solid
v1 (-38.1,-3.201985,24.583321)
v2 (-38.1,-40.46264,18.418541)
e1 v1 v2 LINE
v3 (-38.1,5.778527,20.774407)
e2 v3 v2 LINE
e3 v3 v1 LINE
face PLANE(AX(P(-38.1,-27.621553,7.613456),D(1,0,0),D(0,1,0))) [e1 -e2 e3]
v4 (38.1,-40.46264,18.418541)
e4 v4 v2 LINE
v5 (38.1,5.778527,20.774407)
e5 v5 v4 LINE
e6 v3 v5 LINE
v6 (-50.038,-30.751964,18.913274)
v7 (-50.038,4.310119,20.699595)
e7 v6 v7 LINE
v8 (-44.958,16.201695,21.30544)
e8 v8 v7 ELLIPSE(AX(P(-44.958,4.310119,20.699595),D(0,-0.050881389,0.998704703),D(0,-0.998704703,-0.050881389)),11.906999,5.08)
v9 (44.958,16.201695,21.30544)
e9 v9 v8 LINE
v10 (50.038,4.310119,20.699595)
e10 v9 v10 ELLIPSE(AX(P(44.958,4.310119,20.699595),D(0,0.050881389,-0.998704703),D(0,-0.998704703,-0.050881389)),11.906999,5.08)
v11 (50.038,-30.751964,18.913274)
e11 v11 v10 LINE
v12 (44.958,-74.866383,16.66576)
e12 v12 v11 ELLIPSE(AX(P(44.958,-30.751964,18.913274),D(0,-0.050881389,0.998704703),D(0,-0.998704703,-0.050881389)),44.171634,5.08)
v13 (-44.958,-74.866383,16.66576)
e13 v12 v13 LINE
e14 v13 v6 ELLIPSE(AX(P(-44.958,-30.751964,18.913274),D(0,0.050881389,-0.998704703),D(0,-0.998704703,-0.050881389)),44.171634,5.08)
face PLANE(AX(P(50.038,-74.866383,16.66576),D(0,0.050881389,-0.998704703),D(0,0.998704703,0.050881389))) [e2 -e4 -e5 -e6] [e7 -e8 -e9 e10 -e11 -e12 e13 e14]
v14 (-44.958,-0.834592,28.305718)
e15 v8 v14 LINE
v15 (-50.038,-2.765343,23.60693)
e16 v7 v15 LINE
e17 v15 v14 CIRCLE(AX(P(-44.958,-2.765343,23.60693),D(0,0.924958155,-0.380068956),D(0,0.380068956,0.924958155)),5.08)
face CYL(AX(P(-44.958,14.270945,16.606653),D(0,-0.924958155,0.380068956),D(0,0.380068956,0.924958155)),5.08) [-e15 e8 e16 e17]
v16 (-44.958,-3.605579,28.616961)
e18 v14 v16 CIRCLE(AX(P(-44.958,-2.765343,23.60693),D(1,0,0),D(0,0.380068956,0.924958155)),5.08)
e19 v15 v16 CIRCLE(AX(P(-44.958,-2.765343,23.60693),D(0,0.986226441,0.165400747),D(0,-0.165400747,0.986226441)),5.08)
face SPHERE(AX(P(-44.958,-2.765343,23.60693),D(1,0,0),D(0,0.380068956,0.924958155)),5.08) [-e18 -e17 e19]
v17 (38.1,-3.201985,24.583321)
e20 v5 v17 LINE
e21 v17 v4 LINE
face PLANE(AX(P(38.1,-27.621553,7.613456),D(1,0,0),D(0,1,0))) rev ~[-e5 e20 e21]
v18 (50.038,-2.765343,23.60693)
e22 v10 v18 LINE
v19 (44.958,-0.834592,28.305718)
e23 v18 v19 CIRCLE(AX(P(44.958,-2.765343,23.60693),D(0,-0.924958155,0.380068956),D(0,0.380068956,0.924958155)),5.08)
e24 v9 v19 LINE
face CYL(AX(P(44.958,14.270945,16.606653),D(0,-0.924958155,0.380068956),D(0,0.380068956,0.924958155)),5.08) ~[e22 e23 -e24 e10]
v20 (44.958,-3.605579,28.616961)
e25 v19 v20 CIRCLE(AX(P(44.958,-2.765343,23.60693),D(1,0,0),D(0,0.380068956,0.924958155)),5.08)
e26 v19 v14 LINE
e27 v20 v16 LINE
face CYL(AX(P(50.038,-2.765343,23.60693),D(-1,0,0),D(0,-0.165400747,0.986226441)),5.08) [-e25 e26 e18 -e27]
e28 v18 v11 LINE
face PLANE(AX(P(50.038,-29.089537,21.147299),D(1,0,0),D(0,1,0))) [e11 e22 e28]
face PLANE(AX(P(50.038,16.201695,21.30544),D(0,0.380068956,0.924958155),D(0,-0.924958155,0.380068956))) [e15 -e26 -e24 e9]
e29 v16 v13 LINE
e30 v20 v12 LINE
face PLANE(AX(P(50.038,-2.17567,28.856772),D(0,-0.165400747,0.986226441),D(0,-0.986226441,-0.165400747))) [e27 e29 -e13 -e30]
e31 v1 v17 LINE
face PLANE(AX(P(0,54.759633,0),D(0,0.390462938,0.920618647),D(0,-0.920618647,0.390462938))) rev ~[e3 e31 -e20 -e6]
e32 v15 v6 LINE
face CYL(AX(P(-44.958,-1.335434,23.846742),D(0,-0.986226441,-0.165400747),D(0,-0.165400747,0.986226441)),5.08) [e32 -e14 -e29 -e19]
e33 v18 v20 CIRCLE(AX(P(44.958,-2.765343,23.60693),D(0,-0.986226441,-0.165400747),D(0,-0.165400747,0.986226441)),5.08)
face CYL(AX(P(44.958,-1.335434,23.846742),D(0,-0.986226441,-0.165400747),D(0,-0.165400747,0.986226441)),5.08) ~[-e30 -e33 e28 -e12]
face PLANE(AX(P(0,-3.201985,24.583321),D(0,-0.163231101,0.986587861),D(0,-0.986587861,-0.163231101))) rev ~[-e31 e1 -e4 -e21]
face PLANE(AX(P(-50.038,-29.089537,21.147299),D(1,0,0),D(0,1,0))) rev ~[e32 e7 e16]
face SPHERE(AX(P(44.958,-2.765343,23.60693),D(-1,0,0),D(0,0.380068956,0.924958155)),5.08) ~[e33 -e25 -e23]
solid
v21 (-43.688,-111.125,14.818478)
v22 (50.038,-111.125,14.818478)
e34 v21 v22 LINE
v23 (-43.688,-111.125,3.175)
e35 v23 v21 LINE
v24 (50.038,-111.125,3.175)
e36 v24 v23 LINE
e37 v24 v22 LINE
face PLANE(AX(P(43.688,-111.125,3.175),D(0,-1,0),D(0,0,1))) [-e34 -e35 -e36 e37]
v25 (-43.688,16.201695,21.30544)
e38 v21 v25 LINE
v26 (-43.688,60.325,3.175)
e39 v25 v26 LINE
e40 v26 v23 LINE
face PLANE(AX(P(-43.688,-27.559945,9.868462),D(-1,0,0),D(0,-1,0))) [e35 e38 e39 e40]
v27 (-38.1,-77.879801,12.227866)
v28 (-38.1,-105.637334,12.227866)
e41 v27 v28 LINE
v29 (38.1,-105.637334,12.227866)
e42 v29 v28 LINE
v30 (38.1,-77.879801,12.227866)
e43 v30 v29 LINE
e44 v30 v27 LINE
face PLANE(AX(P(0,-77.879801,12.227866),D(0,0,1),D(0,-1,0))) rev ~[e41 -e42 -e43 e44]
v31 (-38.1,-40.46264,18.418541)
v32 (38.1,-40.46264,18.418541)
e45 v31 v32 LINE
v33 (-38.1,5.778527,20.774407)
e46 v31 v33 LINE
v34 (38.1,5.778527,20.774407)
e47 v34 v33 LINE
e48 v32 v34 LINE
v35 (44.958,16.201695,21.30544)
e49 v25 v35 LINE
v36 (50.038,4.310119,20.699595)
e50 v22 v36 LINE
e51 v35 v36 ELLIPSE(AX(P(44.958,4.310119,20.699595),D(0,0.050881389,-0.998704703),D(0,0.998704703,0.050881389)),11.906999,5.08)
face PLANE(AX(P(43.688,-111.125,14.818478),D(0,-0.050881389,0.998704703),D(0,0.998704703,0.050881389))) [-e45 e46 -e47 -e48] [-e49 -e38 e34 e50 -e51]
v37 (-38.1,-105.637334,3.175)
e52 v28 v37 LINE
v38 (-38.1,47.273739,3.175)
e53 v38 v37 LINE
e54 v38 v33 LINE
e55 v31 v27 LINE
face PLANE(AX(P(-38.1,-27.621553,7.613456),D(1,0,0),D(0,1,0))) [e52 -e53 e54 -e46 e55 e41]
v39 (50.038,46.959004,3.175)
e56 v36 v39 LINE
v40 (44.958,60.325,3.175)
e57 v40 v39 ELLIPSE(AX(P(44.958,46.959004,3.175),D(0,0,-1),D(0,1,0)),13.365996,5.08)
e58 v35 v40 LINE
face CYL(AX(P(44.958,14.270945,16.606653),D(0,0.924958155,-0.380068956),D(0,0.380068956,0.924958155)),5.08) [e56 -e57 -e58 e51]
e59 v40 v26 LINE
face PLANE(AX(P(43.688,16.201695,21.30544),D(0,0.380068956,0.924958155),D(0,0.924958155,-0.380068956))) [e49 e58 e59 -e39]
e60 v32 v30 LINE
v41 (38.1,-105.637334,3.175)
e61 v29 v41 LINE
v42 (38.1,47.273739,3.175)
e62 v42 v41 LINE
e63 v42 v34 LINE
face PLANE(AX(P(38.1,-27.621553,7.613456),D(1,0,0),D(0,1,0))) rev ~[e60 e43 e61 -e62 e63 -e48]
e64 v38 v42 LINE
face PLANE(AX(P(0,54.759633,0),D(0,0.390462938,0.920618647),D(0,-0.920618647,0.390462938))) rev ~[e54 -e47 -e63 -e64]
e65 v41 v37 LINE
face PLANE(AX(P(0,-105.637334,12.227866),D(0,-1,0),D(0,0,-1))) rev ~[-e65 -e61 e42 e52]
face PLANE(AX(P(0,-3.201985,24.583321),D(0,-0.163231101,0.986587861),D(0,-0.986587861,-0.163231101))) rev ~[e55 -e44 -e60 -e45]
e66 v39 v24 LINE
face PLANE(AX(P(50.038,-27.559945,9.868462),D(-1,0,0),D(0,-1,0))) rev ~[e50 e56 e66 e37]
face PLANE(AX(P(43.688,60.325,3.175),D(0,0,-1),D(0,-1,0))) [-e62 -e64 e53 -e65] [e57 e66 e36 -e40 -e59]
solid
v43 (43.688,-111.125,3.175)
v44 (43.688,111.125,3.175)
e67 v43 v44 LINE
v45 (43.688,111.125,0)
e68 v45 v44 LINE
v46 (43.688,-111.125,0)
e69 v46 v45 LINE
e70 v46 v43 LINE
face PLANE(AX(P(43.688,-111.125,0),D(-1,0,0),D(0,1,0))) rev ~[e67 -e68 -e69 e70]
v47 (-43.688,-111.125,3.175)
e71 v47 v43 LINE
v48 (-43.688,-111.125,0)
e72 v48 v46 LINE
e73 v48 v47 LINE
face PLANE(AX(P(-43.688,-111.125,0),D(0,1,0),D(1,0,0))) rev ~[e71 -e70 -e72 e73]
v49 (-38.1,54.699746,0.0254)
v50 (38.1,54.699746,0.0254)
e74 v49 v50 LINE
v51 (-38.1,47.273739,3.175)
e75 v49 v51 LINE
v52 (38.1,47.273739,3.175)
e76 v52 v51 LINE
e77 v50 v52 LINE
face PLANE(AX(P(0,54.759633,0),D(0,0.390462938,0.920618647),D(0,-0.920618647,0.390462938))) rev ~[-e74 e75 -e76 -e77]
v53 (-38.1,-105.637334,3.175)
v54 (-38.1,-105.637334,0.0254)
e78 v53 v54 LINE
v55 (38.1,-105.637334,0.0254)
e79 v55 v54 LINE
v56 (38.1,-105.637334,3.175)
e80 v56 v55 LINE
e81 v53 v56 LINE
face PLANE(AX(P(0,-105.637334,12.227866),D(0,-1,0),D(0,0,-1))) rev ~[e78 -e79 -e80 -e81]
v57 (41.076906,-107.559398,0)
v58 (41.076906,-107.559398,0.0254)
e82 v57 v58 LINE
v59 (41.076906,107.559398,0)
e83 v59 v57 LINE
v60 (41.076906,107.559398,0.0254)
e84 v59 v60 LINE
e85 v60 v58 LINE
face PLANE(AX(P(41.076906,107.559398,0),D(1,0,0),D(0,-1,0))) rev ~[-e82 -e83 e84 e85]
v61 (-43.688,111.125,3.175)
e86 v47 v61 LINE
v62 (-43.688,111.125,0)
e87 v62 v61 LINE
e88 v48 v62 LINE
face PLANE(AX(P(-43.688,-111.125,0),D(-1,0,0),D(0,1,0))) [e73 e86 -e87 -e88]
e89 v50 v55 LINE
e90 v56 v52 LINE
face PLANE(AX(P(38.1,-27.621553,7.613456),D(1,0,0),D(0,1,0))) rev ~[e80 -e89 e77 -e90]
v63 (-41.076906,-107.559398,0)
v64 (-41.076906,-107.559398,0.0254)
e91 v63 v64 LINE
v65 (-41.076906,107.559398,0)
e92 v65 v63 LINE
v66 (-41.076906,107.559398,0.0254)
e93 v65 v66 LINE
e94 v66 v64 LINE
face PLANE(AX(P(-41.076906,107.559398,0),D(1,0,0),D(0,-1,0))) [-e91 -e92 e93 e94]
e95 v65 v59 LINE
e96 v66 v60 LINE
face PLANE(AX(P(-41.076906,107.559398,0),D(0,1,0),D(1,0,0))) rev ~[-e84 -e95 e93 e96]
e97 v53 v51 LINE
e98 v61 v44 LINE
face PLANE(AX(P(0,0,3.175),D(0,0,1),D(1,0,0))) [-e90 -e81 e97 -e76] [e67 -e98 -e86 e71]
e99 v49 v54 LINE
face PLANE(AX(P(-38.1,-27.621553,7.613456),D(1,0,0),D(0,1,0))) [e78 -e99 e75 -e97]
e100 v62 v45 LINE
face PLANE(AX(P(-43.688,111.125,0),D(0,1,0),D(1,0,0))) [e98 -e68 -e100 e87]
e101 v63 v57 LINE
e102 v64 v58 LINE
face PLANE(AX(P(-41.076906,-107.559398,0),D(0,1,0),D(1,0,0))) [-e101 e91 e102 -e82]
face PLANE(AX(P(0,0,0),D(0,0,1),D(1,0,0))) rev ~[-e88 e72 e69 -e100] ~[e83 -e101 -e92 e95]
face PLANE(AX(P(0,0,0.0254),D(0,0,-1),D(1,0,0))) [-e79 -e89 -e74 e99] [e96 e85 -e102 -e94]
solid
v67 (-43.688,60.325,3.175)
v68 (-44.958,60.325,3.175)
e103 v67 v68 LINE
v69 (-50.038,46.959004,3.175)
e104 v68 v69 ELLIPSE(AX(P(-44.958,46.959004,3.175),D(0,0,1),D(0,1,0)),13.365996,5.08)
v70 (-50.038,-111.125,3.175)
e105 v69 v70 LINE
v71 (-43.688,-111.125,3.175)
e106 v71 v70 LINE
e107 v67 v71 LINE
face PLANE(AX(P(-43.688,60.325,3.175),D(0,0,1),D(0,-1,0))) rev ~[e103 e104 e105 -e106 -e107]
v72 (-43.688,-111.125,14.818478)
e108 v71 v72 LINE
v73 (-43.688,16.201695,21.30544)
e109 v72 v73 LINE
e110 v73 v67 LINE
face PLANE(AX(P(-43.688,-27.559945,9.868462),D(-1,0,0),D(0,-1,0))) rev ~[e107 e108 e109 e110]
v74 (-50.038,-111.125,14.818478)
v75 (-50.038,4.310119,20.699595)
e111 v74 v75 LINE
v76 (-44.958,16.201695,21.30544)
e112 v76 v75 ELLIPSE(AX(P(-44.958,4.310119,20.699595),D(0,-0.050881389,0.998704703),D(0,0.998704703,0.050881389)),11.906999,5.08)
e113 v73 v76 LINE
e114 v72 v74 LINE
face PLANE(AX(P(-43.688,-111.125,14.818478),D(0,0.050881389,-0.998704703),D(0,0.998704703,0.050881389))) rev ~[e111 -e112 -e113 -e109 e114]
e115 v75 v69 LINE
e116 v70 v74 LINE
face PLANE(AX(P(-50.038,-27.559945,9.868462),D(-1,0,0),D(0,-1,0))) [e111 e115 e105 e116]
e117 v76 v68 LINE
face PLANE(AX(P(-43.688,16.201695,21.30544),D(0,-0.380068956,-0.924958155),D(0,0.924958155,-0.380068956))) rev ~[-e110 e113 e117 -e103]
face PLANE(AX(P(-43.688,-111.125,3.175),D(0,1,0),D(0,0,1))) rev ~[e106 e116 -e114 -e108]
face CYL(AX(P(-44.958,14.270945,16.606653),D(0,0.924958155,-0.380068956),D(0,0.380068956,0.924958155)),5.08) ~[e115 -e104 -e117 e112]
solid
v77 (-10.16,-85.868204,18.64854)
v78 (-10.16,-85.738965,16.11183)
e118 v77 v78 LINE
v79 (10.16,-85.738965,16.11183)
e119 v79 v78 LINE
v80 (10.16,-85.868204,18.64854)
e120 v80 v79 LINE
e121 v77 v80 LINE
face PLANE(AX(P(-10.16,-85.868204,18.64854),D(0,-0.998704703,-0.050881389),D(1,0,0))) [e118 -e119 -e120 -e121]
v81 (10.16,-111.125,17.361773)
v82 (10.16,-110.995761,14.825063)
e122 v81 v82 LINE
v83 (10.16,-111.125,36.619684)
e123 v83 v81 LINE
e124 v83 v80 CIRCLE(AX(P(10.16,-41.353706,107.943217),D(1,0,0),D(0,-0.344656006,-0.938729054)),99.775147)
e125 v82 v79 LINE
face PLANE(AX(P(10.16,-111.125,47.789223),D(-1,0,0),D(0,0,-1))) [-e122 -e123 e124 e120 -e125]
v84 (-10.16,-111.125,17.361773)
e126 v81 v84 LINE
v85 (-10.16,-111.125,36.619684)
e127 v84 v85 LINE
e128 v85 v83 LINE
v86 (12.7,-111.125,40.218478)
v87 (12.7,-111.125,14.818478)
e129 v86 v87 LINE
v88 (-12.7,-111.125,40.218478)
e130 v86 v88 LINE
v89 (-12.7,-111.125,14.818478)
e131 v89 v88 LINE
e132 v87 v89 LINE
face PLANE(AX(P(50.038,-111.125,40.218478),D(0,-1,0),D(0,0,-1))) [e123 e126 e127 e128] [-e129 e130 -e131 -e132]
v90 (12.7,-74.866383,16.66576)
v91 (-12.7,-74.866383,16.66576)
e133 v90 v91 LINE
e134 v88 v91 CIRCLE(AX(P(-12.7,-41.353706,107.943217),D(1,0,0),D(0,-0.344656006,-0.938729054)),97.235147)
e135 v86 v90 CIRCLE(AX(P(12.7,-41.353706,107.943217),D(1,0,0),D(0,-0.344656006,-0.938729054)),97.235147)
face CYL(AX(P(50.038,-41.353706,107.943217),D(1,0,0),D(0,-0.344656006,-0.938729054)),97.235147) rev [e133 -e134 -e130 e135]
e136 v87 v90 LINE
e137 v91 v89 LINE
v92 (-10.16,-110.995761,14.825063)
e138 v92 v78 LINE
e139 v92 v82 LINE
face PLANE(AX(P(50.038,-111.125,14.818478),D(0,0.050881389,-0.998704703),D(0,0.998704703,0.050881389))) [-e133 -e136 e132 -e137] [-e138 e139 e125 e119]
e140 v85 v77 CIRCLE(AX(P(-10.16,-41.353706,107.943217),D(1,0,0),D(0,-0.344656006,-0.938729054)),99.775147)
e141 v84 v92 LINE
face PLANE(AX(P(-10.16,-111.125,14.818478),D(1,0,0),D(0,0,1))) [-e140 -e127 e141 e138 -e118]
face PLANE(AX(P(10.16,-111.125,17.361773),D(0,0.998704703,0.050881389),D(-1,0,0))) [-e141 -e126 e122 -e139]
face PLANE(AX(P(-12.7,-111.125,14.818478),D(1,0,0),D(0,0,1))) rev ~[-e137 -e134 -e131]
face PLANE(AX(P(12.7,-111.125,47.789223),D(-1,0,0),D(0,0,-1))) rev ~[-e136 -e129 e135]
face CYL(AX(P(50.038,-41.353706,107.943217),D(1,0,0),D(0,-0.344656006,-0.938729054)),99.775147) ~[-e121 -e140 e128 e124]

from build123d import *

# Parameters (mm, degrees)
F0_W      = 87.376
F0_H      = 222.25
F1_DEPTH  = 3.175
F3_DEPTH  = 6.35
F4_DEPTH  = 87.376
F5_DEPTH  = 6.35
F7_DEPTH  = 100.076
F8_W      = 37.338
F8_H      = 25.4
F9_DEPTH  = 38.1
F10_W     = 82.1538120508
F10_H     = 215.1187956333
F11_DEPTH = 0.0254
F13_DEPTH = 38.1
F14_T     = -2.54
F15_DEPTH = 25.4
F16_R     = 5.08
F16_2_R   = 5.08
F16_3_R   = 5.08


# Not quite as in the source:
# - a feature names something its author has since deleted; it is built from what else it names


with BuildPart() as f1:
    # F0 (on Top) → F1 (new body)
    with BuildSketch(Plane.XY):
        Rectangle(F0_W, F0_H)
    extrude(amount=F1_DEPTH)

    # F10 (on face) → F11 (cut)
    with BuildSketch(Plane(origin=(0, 0, 0), x_dir=(1, 0, 0), z_dir=(0, 0, -1))):
        Rectangle(F10_W, F10_H)
    extrude(amount=-F11_DEPTH, mode=Mode.SUBTRACT)


with BuildPart() as f3:
    # F2 (on face) → F3 (new body)
    with BuildSketch(Plane(origin=(-43.688, 0, 0), x_dir=(0, -1, 0), z_dir=(-1, 0, 0))):
        Polygon((-16.2016954273, 21.3054399937), (-60.325, 3.175), (111.125, 3.175), (111.125, 14.8184783757), align=None)
    extrude(amount=F3_DEPTH)


with BuildPart() as f4:
    # F4 (new): a face of the model
    f4_faces = [f3.part.faces().sort_by_distance(p)[0] for p in [
        (-43.688, -29.9876869661, 10.4717867794),
    ]]
    extrude(f4_faces, amount=F4_DEPTH)

    # F5 (add): a face of the model
    f5_faces = [f4.faces().sort_by_distance(p)[0] for p in [
        (43.688, -29.9876869661, 10.4717867794),
    ]]
    extrude(f5_faces, amount=F5_DEPTH)


with BuildPart() as f7:
    # F6 (on face) → F7 (new body)
    with BuildSketch(Plane.YZ.offset(50.038)):
        with BuildLine():
            Line((-111.125, 40.2184783757), (-111.125, 14.8184783757))
            Line((-111.125, 14.8184783757), (-74.8663830833, 16.6657599334))
            ThreePointArc((-74.8663830833, 16.6657599334), (-94.3214065955, 26.4012254718), (-111.125, 40.2184783757))
        make_face()
    extrude(amount=-F7_DEPTH)

    # F8 (on face) → F9 (cut)
    with BuildSketch(Plane.XZ.offset(111.125)):
        Polygon((-50.038, 14.8184783757), (-50.038, 40.2184783757), (-12.7, 40.2184783757), (-12.7, 47.7892234921), (-50.038, 45.227330178), (-81.4004353094, 16.6523270309), align=None)
        with Locations((-31.369, 27.5184783757)):
            Rectangle(F8_W, F8_H)
        Polygon((12.7, 47.7892234921), (12.7, 40.2184783757), (50.038, 40.2184783757), (50.038, 14.8184783757), (75.860601027, 14.8184783757), (72.0834517309, 16.6523270309), (65.1312917471, 48.7745702267), (40.7210164215, 45.227330178), align=None)
        Polygon((50.038, 40.2184783757), (12.7, 40.2184783757), (12.7, 14.8184783757), (46.51265473, 14.8184783757), (50.038, 14.8184783757), align=None)
    extrude(amount=-F9_DEPTH, mode=Mode.SUBTRACT)

    # F14
    f14_openings = [f7.faces().sort_by_distance(p)[0] for p in [
        (0, -111.125, 27.518478),
    ]]
    offset(amount=F14_T, openings=f14_openings)

    # F15 (cut): a face of the model
    f15_faces = [f7.faces().sort_by_distance(p)[0] for p in [
        (0, -98.4966020741, 18.0051564926),
    ]]
    extrude(f15_faces, amount=-F15_DEPTH, mode=Mode.SUBTRACT)


with BuildPart() as f7b:
    # F6 (on face) → F7, piece 2 (new body)
    with BuildSketch(Plane.YZ.offset(50.038)):
        Polygon((-2.1756697122, 28.8567718609), (-74.8663830833, 16.6657599334), (16.2016954273, 21.3054399937), align=None)
    extrude(amount=-F7_DEPTH)


with BuildPart() as f13_tool:
    # F12 (on Right) → F13 (new body, symmetric)
    with BuildSketch(Plane.YZ):
        Polygon((-105.6373342872, 0), (54.759632796, 0), (-3.2019854989, 24.5833210647), (-77.8798013926, 12.2278658673), (-105.6373342872, 12.2278658673), align=None)
    extrude(amount=F13_DEPTH, both=True)


with BuildPart() as f1_1:
    add(f1.part)

    # F13: cut by f13_tool
    add(f13_tool.part, mode=Mode.SUBTRACT)


with BuildPart() as f4_1:
    add(f4.part)

    # F13: cut by f13_tool
    add(f13_tool.part, mode=Mode.SUBTRACT)

    # F16#2
    f16_2_edges = [f4_1.edges().sort_by_distance(p)[0] for p in [
        (50.038, 38.263348, 12.24022),
    ]]
    fillet(f16_2_edges, radius=F16_2_R)


with BuildPart() as f7b_1:
    add(f7b.part)

    # F13: cut by f13_tool
    add(f13_tool.part, mode=Mode.SUBTRACT)

    # F16#3
    f16_3_edges = [f7b_1.edges().sort_by_distance(p)[0] for p in [
        (-50.038, 7.013013, 25.081106),
        (-50.038, -38.521026, 22.761266),
        (50.038, 7.013013, 25.081106),
        (50.038, -38.521026, 22.761266),
        (0, -2.17567, 28.856772),
    ]]
    fillet(f16_3_edges, radius=F16_3_R)


with BuildPart() as f3_1:
    add(f3.part)

    # F16
    f16_edges = [f3_1.edges().sort_by_distance(p)[0] for p in [
        (-50.038, 38.263348, 12.24022),
    ]]
    fillet(f16_edges, radius=F16_R)


solid = Compound([f7.part, f1_1.part, f4_1.part, f7b_1.part, f3_1.part])
